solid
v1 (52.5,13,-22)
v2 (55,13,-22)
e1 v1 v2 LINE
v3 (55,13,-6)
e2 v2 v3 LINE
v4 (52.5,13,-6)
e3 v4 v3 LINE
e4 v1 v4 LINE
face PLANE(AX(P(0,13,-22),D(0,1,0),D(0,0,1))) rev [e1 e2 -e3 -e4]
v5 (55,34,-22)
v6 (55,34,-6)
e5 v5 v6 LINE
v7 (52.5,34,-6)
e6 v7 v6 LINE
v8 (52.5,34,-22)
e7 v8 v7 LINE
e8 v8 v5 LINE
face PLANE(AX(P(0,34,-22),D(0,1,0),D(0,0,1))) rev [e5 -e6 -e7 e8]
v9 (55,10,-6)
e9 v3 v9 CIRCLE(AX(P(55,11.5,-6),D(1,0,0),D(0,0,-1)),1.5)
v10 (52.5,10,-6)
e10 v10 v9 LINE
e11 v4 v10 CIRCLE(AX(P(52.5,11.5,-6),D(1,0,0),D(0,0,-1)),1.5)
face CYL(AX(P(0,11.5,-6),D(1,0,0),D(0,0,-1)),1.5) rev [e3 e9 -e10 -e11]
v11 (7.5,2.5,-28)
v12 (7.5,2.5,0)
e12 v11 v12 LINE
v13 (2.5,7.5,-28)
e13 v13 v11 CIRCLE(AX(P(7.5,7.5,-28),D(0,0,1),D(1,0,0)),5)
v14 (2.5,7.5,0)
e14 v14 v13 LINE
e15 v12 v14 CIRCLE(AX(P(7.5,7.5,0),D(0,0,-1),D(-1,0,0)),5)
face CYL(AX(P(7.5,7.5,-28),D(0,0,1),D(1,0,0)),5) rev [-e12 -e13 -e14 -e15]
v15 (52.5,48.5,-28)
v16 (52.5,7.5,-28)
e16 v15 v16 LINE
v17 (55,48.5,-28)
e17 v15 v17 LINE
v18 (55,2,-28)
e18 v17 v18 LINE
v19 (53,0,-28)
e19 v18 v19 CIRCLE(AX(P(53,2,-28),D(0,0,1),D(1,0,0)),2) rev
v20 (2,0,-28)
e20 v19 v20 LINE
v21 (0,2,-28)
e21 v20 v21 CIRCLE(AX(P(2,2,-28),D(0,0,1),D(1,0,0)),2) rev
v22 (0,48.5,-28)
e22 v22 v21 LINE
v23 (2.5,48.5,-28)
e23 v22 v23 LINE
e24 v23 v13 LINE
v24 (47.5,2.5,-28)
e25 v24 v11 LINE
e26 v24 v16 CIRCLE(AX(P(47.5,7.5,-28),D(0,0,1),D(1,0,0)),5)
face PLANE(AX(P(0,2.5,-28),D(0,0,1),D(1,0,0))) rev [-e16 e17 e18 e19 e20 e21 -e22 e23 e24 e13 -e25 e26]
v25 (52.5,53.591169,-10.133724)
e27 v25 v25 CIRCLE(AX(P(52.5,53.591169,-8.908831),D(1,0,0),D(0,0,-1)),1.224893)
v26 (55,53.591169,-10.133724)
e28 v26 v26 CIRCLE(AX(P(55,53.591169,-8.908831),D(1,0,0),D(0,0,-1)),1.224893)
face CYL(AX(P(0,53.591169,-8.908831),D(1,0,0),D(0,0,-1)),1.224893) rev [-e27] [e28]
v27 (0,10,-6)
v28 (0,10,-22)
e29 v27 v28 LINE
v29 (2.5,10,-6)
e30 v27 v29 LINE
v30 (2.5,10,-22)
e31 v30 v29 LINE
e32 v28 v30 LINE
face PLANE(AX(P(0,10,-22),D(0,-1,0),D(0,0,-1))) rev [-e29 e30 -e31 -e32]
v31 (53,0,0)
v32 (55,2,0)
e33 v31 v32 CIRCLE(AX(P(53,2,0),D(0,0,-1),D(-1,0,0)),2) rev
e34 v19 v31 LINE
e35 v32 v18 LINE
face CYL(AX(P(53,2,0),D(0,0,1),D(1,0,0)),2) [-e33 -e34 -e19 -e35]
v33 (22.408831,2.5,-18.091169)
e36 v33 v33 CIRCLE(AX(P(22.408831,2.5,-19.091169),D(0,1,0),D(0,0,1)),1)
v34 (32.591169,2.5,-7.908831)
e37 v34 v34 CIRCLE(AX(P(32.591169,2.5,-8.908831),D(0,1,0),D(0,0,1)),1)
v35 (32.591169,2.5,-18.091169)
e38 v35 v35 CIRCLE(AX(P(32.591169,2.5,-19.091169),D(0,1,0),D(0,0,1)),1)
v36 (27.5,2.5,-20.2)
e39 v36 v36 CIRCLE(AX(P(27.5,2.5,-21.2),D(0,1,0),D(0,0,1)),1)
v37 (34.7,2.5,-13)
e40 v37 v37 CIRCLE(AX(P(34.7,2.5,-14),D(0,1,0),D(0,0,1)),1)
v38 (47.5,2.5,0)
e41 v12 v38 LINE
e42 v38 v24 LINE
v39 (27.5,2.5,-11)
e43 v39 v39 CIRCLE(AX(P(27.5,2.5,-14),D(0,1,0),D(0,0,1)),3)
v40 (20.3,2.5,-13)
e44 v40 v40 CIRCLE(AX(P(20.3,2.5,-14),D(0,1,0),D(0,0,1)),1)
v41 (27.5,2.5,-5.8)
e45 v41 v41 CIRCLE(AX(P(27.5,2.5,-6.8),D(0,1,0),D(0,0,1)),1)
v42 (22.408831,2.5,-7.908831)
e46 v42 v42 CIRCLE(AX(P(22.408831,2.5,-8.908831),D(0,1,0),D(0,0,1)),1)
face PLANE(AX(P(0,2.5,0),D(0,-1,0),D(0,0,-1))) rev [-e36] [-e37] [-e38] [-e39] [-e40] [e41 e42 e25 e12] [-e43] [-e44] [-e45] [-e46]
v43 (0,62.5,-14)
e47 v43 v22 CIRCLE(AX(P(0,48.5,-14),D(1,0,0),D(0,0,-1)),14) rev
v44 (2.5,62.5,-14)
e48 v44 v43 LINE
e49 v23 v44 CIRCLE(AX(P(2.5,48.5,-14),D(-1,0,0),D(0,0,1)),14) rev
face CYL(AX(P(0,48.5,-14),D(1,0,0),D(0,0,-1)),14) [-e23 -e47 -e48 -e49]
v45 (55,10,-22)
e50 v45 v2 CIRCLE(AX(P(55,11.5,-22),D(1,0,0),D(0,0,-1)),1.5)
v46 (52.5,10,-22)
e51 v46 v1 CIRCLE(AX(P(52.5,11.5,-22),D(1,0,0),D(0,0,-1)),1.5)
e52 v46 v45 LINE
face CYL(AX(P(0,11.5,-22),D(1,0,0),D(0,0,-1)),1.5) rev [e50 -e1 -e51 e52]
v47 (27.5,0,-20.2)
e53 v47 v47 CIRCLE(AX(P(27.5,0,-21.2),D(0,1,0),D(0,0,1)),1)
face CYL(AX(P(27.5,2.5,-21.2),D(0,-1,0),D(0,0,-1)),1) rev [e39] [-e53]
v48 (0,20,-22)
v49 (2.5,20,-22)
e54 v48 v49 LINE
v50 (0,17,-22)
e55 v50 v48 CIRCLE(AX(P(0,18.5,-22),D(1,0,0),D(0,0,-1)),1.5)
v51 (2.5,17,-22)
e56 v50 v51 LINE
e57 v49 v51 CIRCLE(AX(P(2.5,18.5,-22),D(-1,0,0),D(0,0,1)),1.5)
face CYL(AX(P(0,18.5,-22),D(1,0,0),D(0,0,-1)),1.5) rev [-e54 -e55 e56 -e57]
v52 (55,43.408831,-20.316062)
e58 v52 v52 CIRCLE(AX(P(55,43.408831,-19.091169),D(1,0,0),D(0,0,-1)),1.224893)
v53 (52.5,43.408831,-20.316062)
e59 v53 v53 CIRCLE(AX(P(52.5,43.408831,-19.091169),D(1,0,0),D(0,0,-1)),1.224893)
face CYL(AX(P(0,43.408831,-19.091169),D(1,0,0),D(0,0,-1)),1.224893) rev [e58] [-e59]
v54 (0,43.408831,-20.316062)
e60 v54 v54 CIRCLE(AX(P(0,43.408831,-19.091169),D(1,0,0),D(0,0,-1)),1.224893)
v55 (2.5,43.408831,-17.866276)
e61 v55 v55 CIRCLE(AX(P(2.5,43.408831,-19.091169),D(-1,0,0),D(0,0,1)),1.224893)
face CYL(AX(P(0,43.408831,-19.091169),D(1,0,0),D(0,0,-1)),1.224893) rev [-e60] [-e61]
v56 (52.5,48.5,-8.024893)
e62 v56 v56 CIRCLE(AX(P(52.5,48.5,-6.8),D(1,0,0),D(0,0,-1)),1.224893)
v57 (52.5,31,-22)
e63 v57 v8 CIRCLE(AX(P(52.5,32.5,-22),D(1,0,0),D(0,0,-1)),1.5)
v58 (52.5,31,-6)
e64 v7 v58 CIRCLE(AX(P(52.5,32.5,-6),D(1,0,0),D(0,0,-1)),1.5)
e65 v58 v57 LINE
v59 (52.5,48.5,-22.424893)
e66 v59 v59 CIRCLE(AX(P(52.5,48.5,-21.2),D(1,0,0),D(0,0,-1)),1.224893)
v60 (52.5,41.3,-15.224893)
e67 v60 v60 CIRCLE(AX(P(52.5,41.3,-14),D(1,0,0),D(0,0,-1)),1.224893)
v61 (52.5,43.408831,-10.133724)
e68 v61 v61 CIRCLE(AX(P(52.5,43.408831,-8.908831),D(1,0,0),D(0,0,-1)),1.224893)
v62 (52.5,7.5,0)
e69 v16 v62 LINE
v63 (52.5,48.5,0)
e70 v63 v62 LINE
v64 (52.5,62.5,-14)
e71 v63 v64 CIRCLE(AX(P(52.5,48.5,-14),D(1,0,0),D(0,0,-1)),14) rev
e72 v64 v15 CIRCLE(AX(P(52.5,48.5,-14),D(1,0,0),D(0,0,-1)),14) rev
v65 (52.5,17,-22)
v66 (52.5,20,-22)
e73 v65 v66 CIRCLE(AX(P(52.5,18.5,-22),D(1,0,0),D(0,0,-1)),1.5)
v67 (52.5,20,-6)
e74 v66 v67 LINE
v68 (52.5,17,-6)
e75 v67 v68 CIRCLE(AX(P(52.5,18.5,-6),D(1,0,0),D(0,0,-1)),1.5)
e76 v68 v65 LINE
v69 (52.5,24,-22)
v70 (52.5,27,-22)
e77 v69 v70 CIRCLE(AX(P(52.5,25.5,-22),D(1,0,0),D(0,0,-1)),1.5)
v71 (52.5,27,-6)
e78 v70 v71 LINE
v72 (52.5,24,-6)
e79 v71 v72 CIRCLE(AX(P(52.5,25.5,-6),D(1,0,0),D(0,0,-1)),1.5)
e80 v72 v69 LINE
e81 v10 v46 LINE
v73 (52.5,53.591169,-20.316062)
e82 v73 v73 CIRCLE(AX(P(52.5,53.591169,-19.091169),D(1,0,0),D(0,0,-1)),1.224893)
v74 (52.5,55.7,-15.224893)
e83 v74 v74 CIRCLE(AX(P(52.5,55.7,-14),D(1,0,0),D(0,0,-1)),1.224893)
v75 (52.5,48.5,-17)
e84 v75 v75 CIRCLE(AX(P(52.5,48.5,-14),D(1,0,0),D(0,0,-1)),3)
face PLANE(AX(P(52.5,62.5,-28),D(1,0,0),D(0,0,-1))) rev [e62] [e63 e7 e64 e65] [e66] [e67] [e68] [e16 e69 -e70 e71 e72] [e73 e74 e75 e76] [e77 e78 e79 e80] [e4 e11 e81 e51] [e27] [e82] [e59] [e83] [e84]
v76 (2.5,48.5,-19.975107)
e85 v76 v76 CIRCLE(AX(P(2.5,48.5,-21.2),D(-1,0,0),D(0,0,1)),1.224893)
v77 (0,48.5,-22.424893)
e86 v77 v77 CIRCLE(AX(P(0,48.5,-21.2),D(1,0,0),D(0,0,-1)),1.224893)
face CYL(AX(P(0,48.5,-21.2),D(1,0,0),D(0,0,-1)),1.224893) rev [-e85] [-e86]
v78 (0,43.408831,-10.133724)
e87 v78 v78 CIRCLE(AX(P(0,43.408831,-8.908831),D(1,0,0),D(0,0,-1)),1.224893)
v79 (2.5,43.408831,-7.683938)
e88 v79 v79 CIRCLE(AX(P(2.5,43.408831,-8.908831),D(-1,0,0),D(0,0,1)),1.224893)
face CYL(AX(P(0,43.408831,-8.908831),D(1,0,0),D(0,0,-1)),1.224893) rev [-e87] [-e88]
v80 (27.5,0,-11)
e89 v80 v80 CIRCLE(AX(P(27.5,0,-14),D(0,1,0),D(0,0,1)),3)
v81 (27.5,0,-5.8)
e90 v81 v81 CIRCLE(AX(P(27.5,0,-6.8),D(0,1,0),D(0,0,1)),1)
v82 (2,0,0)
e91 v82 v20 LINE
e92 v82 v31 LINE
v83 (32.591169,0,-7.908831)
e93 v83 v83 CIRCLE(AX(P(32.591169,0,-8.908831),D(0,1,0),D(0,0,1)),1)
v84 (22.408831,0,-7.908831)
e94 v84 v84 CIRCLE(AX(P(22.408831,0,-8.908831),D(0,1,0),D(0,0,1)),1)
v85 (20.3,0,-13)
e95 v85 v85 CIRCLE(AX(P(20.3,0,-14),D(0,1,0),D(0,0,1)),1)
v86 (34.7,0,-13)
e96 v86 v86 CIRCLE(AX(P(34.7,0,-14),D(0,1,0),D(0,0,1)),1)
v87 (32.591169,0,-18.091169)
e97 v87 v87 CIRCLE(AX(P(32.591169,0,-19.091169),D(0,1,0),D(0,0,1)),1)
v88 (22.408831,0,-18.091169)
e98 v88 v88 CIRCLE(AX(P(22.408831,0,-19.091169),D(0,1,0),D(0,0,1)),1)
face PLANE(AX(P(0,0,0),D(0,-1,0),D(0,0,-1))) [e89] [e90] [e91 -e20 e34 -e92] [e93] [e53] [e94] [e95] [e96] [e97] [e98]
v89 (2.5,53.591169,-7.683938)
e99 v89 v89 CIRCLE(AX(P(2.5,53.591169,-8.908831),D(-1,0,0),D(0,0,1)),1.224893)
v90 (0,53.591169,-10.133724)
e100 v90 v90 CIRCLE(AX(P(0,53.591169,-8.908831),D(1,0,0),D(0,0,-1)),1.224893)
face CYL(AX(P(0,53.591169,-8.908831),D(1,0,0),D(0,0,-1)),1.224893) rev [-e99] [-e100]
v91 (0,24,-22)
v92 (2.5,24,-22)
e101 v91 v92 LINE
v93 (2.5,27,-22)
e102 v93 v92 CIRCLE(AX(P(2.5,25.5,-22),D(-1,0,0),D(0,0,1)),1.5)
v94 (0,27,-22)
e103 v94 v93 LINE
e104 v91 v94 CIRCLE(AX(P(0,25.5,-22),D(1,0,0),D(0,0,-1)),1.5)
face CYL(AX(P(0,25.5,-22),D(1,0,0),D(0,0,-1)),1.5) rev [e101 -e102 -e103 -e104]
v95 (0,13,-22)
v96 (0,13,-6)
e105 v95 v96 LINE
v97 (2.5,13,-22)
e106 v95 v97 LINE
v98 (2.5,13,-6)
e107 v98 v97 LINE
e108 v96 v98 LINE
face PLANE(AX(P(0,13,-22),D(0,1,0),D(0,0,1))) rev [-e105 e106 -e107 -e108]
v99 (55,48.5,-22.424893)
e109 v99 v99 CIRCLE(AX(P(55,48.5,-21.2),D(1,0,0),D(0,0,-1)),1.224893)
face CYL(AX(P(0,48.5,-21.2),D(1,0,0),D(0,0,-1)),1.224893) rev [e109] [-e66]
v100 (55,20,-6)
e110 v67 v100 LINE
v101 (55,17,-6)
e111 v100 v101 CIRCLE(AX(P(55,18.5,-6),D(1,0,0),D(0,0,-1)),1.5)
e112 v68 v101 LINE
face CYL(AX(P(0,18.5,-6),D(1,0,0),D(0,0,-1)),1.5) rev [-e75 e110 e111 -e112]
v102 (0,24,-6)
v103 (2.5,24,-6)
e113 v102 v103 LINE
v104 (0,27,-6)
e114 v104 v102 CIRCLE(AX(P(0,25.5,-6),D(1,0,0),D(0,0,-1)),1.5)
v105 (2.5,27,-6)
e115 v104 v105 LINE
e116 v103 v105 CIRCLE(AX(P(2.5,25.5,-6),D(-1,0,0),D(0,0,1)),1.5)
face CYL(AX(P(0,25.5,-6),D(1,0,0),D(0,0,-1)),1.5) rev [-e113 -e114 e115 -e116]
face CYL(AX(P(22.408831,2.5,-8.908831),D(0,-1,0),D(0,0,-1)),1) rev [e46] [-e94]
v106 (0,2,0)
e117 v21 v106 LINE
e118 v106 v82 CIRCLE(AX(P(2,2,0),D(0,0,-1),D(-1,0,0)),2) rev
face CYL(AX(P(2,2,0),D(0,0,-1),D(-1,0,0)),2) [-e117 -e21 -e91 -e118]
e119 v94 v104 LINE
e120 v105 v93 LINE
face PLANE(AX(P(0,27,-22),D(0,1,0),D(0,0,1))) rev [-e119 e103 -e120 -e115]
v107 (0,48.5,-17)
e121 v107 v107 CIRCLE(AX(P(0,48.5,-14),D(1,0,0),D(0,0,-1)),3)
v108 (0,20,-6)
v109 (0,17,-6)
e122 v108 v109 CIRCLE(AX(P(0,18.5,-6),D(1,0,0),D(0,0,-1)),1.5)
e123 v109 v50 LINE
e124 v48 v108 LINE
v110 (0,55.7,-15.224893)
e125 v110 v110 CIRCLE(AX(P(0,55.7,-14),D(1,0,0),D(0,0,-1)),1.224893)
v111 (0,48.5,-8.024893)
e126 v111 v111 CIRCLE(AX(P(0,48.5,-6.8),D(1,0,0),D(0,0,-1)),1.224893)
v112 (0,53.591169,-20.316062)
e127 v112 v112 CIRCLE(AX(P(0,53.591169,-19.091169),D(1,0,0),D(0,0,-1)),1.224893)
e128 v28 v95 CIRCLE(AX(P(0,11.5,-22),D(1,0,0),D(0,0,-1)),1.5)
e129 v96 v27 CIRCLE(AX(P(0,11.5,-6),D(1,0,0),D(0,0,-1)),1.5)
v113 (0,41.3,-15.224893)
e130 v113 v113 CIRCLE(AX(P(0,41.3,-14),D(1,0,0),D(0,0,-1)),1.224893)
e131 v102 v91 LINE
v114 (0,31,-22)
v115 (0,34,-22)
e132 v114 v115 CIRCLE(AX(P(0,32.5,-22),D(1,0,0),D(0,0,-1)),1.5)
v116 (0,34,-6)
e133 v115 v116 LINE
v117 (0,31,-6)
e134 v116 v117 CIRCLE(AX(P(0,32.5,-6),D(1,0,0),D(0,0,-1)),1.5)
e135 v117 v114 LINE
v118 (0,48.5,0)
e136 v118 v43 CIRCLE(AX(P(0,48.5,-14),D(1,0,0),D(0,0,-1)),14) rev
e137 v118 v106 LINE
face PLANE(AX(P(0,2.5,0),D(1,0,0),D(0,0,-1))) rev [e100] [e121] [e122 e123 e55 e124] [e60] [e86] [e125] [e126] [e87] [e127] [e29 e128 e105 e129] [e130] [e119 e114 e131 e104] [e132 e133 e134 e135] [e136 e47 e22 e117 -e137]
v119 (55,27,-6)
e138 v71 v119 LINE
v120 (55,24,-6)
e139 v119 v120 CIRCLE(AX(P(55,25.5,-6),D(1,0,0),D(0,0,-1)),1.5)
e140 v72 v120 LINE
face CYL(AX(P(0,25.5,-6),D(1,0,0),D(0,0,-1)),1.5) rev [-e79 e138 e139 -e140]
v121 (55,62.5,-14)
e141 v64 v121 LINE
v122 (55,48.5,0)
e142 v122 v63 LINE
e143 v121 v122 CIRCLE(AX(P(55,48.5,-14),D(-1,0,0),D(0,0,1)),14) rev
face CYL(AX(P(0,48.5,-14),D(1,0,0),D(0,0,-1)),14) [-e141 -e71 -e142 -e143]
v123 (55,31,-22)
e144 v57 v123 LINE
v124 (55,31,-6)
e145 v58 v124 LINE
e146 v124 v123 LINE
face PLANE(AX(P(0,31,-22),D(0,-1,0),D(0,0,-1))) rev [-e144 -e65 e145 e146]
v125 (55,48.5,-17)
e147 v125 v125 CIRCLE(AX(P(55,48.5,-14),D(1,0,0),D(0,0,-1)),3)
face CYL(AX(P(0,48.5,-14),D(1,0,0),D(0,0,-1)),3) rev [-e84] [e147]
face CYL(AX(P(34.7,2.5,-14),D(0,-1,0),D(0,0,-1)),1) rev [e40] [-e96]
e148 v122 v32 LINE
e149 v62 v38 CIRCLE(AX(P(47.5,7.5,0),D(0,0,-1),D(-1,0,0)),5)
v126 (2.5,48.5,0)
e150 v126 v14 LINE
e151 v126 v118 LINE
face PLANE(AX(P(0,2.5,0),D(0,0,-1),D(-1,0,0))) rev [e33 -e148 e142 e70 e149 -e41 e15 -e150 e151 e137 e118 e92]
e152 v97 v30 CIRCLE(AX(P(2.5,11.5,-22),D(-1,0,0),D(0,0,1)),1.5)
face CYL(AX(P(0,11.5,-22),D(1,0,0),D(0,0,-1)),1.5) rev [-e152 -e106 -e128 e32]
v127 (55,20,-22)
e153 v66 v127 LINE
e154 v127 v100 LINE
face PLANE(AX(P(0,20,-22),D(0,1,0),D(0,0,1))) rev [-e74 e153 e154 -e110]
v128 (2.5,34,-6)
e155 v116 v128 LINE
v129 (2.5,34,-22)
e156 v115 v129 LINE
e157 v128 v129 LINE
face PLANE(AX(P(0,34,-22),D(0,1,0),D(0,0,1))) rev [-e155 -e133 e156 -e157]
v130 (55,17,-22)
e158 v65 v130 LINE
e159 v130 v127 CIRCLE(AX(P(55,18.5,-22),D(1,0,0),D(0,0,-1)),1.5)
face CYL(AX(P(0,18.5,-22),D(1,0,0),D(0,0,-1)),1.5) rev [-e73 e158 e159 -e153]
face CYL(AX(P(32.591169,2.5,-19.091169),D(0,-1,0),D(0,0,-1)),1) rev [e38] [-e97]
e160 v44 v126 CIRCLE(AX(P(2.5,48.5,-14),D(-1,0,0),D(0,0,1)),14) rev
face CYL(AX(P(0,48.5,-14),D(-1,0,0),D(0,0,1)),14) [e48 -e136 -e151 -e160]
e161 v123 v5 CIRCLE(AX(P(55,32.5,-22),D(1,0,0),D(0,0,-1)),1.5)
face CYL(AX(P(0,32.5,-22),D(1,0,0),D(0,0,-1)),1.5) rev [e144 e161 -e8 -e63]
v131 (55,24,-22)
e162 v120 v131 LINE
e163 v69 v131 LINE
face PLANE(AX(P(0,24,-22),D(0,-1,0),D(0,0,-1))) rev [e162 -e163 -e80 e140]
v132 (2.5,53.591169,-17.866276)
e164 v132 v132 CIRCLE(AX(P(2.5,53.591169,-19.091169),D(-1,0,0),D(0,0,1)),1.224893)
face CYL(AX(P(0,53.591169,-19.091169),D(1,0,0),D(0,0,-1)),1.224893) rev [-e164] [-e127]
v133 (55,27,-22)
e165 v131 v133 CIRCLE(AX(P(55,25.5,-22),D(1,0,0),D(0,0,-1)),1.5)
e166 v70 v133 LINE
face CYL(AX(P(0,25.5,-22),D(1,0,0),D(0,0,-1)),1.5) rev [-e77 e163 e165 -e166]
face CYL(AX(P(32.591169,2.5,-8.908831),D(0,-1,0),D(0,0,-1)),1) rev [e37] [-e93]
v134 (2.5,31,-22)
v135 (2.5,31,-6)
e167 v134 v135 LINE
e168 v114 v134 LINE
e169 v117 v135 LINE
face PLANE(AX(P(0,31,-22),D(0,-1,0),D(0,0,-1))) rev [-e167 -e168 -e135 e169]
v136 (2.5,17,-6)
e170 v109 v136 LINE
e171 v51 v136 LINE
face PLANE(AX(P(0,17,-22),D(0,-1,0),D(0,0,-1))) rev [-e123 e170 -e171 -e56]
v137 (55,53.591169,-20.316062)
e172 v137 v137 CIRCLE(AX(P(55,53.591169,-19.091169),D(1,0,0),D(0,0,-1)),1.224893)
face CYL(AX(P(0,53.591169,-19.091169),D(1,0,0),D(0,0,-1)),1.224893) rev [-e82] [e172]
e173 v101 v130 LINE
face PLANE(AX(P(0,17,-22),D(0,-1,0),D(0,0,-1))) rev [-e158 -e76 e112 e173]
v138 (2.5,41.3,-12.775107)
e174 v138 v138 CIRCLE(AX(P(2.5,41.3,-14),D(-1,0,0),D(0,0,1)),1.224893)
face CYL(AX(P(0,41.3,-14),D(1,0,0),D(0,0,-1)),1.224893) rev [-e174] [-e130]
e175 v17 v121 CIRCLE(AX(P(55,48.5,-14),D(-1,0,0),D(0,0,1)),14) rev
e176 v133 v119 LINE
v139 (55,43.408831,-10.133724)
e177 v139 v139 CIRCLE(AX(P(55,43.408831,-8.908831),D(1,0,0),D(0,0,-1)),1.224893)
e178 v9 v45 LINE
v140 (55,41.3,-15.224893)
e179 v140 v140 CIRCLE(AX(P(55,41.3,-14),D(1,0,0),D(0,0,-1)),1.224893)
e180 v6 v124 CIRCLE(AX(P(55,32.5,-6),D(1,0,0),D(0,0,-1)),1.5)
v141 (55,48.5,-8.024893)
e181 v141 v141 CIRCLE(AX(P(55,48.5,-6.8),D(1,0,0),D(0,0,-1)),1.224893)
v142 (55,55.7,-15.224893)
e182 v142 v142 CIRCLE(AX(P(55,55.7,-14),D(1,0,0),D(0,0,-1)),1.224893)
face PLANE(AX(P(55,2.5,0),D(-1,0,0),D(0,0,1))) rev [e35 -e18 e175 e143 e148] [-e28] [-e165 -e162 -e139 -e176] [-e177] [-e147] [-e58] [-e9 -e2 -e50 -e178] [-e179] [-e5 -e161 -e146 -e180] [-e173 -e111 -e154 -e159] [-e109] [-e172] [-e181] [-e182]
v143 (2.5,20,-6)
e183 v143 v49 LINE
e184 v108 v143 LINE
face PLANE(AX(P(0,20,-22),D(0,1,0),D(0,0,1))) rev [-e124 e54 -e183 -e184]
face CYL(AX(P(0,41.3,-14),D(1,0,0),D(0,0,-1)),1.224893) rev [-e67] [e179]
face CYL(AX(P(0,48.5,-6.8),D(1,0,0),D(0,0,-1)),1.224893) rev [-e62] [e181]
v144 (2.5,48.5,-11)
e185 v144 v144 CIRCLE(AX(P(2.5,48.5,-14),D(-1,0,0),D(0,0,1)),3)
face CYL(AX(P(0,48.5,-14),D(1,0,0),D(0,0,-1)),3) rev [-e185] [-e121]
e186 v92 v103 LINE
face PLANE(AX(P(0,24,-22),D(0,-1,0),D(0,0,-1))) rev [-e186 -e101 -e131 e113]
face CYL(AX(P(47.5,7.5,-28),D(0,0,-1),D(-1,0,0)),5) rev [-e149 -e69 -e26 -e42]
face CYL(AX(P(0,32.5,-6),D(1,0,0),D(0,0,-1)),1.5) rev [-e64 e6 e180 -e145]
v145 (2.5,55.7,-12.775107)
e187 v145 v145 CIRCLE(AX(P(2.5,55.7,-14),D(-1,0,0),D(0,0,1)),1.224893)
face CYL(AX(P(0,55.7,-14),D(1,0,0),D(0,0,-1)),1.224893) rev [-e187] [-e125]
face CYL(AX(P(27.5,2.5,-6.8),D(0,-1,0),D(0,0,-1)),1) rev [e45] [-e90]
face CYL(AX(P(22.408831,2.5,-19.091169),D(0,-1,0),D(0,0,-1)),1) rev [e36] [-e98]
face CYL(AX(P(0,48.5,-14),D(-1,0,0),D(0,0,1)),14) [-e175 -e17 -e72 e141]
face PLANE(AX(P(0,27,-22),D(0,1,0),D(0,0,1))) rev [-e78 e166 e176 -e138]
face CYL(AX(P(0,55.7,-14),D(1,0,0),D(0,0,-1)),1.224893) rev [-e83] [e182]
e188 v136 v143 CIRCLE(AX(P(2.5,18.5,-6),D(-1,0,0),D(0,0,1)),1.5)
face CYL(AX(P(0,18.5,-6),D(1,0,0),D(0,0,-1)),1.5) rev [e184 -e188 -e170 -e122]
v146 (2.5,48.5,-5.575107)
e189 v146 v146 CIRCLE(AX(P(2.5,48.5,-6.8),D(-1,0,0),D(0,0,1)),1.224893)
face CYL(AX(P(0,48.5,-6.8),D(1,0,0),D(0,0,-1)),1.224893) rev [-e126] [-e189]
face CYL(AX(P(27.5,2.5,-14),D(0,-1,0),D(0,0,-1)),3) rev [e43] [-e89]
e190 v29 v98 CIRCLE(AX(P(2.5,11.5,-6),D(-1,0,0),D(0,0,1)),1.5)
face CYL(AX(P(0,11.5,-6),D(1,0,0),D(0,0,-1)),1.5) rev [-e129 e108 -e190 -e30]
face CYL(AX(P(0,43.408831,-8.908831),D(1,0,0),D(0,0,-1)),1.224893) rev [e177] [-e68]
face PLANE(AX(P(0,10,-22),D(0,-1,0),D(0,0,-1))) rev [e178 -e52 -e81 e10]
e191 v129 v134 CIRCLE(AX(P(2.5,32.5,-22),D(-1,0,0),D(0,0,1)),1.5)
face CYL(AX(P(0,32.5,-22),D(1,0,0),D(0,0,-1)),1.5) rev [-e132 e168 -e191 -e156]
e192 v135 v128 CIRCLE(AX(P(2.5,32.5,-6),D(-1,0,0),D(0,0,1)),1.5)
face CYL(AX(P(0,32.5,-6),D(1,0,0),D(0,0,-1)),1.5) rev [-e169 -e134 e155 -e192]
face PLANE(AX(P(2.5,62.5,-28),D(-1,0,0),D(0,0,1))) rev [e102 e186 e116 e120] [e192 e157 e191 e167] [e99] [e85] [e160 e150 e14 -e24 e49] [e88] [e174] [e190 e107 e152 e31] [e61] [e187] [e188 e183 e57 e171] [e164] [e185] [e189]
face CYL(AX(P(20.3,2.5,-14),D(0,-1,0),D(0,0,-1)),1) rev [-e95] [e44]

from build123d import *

# Parameters (mm, degrees)
ESQUISSE1_W             = 55
ESQUISSE1_H             = 28
ESQUISSE1_R             = 1
ESQUISSE1_R_2           = 3
BOSS_EXTRU_1_DEPTH      = 2.5
ESQUISSE2_W             = 2.5
ESQUISSE2_H             = 28
BOSS_EXTRU_2_DEPTH      = 60
CONG_1_R                = 5
CONG_2_R                = 2
ESQUISSE3_R             = 1.224893227
ESQUISSE3_R_2           = 3
ENL_V_MAT_EXTRU_1_DEPTH = 55
CONG_3_R                = 14


with BuildPart() as part:
    # Esquisse1 → Boss.-Extru.1 (new body)
    with BuildSketch(Plane(origin=(0, 0, 0), x_dir=(1, 0, 0), z_dir=(0, 1, 0))):
        with Locations((27.5, 14)):
            Rectangle(ESQUISSE1_W, ESQUISSE1_H)
        with Locations(Location((22.408831175, 19.091168825, 0), (0, 0, 270))):
            Circle(ESQUISSE1_R, mode=Mode.SUBTRACT)
        with Locations(Location((27.5, 21.2, 0), (0, 0, 270))):
            Circle(ESQUISSE1_R, mode=Mode.SUBTRACT)
        with Locations(Location((32.591168825, 19.091168825, 0), (0, 0, 270))):
            Circle(ESQUISSE1_R, mode=Mode.SUBTRACT)
        with Locations(Location((34.7, 14, 0), (0, 0, 270))):
            Circle(ESQUISSE1_R, mode=Mode.SUBTRACT)
        with Locations(Location((32.591168825, 8.908831175, 0), (0, 0, 270))):
            Circle(ESQUISSE1_R, mode=Mode.SUBTRACT)
        with Locations(Location((27.5, 6.8, 0), (0, 0, 270))):
            Circle(ESQUISSE1_R, mode=Mode.SUBTRACT)
        with Locations(Location((22.408831175, 8.908831175, 0), (0, 0, 270))):
            Circle(ESQUISSE1_R, mode=Mode.SUBTRACT)
        with Locations(Location((20.3, 14, 0), (0, 0, 270))):
            Circle(ESQUISSE1_R, mode=Mode.SUBTRACT)
        with Locations(Location((27.5, 14, 0), (0, 0, 270))):
            Circle(ESQUISSE1_R_2, mode=Mode.SUBTRACT)
    extrude(amount=BOSS_EXTRU_1_DEPTH)

    # Esquisse2 → Boss.-Extru.2 (add)
    with BuildSketch(Plane(origin=(0, 2.5, 0), x_dir=(1, 0, 0), z_dir=(0, 1, 0))):
        with Locations((1.25, 14)):
            Rectangle(ESQUISSE2_W, ESQUISSE2_H)
        with Locations((53.75, 14)):
            Rectangle(ESQUISSE2_W, ESQUISSE2_H)
    extrude(amount=BOSS_EXTRU_2_DEPTH)

    # Congé1
    cong_1_edges = [part.edges().sort_by_distance(p)[0] for p in [
        (2.5, 2.5, -14),
        (52.5, 2.5, -14),
    ]]
    fillet(cong_1_edges, radius=CONG_1_R)

    # Congé2
    cong_2_edges = [part.edges().sort_by_distance(p)[0] for p in [
        (55, 0, -14),
        (0, 0, -14),
    ]]
    fillet(cong_2_edges, radius=CONG_2_R)

    # Esquisse3 → Enlèv. mat.-Extru.1 (cut)
    with BuildSketch(Plane(origin=(55, 0, 0), x_dir=(0, 0, -1), z_dir=(1, 0, 0))):
        with Locations((14, 41.3)):
            Circle(ESQUISSE3_R)
        with Locations((8.908831175, 43.408831175)):
            Circle(ESQUISSE3_R)
        with Locations((6.8, 48.5)):
            Circle(ESQUISSE3_R)
        with Locations((8.908831175, 53.591168825)):
            Circle(ESQUISSE3_R)
        with Locations((14, 55.7)):
            Circle(ESQUISSE3_R)
        with Locations((19.091168825, 53.591168825)):
            Circle(ESQUISSE3_R)
        with Locations((21.2, 48.5)):
            Circle(ESQUISSE3_R)
        with Locations((19.091168825, 43.408831175)):
            Circle(ESQUISSE3_R)
        with Locations((14, 48.5)):
            Circle(ESQUISSE3_R_2)
        with BuildLine():
            Line((22, 10), (6, 10))
            ThreePointArc((6, 10), (4.5, 11.5), (6, 13))
            Line((6, 13), (22, 13))
            ThreePointArc((22, 13), (23.5, 11.5), (22, 10))
        make_face()
        with BuildLine():
            Line((22, 17), (6, 17))
            ThreePointArc((6, 17), (4.5, 18.5), (6, 20))
            Line((6, 20), (22, 20))
            ThreePointArc((22, 20), (23.5, 18.5), (22, 17))
        make_face()
        with BuildLine():
            Line((22, 24), (6, 24))
            ThreePointArc((6, 24), (4.5, 25.5), (6, 27))
            Line((6, 27), (22, 27))
            ThreePointArc((22, 27), (23.5, 25.5), (22, 24))
        make_face()
        with BuildLine():
            Line((22, 31), (6, 31))
            ThreePointArc((6, 31), (4.5, 32.5), (6, 34))
            Line((6, 34), (22, 34))
            ThreePointArc((22, 34), (23.5, 32.5), (22, 31))
        make_face()
    extrude(amount=-ENL_V_MAT_EXTRU_1_DEPTH, mode=Mode.SUBTRACT)

    # Congé3
    cong_3_edges = [part.edges().sort_by_distance(p)[0] for p in [
        (1.25, 62.5, 0),
        (53.75, 62.5, -28),
        (53.75, 62.5, 0),
        (1.25, 62.5, -28),
    ]]
    fillet(cong_3_edges, radius=CONG_3_R - 0.0001)  # a hair under: the kernel refuses the full size


solid = part.part
